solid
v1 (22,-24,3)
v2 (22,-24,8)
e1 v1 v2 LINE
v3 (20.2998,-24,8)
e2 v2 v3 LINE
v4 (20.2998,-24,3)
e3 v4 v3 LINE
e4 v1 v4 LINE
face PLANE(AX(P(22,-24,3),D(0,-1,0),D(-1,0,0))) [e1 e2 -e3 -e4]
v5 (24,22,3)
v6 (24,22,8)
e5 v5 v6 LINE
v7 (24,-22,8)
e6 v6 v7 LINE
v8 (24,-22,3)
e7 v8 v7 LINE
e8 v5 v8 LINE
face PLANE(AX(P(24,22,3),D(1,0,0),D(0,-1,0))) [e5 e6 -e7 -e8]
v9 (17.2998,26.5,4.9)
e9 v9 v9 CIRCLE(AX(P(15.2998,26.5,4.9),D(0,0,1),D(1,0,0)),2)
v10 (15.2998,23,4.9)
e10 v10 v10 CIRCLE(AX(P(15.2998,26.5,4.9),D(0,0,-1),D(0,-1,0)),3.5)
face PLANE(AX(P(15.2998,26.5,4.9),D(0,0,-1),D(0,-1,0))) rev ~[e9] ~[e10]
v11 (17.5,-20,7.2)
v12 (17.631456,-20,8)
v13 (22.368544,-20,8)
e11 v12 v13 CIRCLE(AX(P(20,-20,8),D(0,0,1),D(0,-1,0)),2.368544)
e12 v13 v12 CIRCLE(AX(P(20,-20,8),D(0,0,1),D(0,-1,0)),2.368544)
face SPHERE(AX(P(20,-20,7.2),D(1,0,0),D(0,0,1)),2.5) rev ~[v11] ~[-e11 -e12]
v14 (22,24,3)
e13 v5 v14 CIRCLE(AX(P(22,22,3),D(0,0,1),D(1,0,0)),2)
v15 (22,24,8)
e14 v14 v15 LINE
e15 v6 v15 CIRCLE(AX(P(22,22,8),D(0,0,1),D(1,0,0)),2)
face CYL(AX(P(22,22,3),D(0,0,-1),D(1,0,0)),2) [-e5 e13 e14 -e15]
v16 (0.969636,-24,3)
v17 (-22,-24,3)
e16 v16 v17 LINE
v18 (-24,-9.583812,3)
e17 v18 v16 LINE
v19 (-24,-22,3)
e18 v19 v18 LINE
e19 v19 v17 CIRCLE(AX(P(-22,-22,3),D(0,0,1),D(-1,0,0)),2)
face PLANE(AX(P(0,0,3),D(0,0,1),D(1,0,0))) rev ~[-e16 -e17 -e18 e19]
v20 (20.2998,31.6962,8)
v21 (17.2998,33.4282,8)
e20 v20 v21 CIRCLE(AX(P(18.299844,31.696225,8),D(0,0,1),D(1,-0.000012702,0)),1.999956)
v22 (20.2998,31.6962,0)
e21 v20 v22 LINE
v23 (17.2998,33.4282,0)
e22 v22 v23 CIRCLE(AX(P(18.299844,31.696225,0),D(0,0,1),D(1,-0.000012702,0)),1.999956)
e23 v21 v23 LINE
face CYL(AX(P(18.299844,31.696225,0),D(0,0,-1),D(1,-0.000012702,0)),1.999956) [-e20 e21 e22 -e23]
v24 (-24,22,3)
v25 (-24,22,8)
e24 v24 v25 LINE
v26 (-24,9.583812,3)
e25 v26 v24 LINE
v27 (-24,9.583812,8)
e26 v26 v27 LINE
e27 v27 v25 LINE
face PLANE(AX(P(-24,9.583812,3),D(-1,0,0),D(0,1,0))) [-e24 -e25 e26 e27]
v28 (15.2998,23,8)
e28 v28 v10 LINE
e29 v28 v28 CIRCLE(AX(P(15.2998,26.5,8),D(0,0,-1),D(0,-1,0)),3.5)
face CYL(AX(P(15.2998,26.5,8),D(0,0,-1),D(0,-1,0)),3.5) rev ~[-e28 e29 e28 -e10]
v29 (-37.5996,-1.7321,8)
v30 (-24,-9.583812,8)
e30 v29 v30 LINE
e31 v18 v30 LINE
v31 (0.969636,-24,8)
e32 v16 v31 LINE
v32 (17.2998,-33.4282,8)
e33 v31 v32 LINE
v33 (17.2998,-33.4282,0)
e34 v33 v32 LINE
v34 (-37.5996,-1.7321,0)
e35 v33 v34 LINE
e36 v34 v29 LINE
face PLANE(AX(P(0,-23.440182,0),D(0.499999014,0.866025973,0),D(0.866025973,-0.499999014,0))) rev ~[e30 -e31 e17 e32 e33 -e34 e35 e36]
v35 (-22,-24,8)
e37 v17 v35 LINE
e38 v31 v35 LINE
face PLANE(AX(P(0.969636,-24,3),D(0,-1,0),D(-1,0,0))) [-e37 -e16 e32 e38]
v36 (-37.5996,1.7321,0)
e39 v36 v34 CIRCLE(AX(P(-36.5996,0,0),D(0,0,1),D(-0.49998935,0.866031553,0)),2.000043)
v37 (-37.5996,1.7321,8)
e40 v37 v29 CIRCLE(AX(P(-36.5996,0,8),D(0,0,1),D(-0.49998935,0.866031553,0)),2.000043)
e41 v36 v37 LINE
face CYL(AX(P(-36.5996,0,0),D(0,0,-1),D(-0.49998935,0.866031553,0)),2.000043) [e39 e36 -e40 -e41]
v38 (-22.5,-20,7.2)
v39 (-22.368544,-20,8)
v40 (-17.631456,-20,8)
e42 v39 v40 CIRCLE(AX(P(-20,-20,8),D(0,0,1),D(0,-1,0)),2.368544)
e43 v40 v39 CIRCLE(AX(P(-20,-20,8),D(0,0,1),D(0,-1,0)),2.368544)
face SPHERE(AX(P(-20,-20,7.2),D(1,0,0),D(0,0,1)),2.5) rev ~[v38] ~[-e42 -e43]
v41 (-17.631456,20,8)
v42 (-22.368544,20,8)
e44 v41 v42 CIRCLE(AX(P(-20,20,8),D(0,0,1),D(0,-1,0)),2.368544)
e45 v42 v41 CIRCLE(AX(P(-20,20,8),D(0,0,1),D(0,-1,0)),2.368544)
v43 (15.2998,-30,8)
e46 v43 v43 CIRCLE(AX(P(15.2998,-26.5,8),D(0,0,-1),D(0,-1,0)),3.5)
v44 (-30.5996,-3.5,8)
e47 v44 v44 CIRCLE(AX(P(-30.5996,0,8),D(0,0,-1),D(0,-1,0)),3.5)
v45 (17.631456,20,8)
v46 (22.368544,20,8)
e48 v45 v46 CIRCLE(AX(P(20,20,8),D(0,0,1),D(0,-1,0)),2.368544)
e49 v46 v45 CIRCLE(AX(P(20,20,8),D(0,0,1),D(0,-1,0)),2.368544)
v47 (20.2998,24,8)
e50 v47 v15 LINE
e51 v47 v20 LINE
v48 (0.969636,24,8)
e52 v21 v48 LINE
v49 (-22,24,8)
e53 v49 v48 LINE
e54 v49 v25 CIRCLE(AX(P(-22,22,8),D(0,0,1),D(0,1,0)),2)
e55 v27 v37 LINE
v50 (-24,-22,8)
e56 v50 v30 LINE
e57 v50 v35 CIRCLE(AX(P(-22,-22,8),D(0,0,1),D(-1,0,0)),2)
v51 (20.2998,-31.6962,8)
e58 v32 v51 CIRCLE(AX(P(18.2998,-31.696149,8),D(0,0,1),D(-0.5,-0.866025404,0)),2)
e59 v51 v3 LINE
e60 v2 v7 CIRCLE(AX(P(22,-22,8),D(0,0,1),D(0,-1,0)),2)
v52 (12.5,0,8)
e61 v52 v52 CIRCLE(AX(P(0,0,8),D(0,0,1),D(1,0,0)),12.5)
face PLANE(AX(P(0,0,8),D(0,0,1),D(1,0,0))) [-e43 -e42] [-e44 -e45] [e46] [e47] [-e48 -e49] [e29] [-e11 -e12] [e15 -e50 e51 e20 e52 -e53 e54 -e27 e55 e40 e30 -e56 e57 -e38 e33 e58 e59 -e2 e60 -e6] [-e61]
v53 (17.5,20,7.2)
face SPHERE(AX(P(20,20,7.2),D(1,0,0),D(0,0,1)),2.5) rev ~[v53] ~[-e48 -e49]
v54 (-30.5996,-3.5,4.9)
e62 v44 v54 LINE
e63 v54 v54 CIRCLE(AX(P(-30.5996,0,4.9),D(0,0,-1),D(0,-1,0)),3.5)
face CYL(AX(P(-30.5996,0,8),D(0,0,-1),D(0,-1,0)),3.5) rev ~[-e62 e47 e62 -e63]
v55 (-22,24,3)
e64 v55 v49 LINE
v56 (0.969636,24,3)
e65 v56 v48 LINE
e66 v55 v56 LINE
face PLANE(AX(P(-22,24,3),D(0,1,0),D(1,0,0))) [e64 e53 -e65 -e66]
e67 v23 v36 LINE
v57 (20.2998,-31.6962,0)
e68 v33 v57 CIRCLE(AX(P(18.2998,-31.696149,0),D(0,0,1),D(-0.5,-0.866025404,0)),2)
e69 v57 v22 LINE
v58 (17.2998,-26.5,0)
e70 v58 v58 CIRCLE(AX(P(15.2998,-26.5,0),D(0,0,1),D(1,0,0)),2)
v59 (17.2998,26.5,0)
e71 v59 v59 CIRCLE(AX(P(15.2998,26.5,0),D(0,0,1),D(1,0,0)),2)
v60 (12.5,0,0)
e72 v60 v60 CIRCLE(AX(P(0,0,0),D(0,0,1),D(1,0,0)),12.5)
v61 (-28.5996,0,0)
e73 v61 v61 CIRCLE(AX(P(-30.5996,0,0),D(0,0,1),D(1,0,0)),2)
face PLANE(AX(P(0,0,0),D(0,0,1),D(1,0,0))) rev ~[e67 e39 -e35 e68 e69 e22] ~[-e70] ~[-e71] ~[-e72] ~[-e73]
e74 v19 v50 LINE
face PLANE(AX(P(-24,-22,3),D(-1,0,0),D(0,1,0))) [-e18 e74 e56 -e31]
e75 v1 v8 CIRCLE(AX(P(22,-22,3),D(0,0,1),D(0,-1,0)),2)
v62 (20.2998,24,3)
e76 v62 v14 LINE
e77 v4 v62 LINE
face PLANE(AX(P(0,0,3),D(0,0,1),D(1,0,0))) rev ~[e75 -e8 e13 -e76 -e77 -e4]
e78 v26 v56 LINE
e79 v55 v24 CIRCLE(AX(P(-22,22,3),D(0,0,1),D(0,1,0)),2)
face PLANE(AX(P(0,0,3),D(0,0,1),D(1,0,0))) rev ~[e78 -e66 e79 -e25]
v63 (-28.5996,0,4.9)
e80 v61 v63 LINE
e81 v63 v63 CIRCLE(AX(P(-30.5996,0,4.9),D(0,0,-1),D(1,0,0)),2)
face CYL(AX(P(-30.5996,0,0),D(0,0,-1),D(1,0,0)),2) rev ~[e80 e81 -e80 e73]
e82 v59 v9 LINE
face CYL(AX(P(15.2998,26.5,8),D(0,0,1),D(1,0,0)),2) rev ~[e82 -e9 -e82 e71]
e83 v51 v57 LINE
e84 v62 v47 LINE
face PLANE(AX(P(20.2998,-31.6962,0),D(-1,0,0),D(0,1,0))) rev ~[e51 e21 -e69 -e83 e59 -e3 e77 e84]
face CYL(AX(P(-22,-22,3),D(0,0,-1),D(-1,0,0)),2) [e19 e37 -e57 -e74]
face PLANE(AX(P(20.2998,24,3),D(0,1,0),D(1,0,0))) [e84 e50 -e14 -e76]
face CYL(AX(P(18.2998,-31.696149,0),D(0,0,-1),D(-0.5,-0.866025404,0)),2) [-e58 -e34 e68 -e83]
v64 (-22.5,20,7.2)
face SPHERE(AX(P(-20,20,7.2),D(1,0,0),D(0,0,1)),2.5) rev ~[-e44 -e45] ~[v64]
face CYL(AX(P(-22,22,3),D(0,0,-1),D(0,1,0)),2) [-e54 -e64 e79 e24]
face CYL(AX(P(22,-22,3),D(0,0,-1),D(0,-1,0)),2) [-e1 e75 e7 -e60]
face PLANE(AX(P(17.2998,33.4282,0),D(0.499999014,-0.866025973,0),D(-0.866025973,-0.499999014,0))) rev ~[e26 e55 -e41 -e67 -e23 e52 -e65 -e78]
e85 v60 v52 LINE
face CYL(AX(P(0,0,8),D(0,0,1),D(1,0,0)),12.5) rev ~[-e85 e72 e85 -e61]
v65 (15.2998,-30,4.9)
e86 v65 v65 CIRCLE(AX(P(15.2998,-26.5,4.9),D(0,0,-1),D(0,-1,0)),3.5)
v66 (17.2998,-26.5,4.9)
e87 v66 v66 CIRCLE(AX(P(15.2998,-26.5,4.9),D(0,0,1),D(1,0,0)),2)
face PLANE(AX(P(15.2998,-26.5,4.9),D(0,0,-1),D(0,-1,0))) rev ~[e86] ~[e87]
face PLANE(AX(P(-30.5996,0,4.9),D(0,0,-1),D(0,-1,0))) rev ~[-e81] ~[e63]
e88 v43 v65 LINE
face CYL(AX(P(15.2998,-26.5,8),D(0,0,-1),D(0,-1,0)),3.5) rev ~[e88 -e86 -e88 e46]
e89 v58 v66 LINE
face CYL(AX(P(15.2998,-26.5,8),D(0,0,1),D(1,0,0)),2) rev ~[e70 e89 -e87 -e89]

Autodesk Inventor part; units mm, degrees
ref_plane "YZ Plane" through (0, 0, 0) normal (1, 0, 0) x (0, 1, 0)
ref_plane "XZ Plane" through (0, 0, 0) normal (0, 1, 0) x (-1, 0, 0)
ref_plane "XY Plane" through (0, 0, 0) normal (0, 0, 1) x (1, 0, 0)
sketch "Sketch1" plane through (0, 0, 0) normal (0, 0, 1) x (1, 0, 0)
  line L0 (15.2998, 26.5) -> (15.2998, -26.5) construction
  line L1 (15.2998, -26.5) -> (-30.5996, 0) construction
  line L2 (-30.5996, 0) -> (15.2998, 26.5) construction
  line L3 (0, 48.0119) -> (0, -48.0119) projected
  circle A0 centre (0, 0) radius 12.5
  line L4 (24.9, -24.45) -> (-24.9, -24.45) construction
  line L5 (-24.9, -24.45) -> (-24.9, 24.45) construction
  line L6 (-24.9, 24.45) -> (24.9, 24.45) construction
  line L7 (24.9, 24.45) -> (24.9, -24.45) construction
  line L8 (24.9, -24.45) -> (-24.9, 24.45) construction
  line L9 (-24.9, -24.45) -> (24.9, 24.45) construction
  line L10 (20, -20) -> (-20, -20) construction
  line L11 (-20, -20) -> (-20, 20) construction
  line L12 (-20, 20) -> (20, 20) construction
  line L13 (20, 20) -> (20, -20) construction
  line L14 (20, -20) -> (-20, 20) construction
  line L15 (-20, -20) -> (20, 20) construction
  line L16 (-37.5996, -1.7321) -> (17.2998, -33.4282)
  line L17 (20.2998, -31.6962) -> (20.2998, 31.6962)
  line L18 (17.2998, 33.4282) -> (-37.5996, 1.7321)
  arc A1 (-37.5996, 1.7321) -> (-37.5996, -1.7321) centre (-36.5996, 0) ccw
  arc A2 (20.2998, 31.6962) -> (17.2998, 33.4282) centre (18.2998, 31.6962) ccw
  arc A3 (17.2998, -33.4282) -> (20.2998, -31.6962) centre (18.2998, -31.6962) ccw
  circle A4 centre (15.2998, 26.5) radius 2
  circle A5 centre (-30.5996, 0) radius 2
  circle A6 centre (15.2998, -26.5) radius 2
  dimension "d1" = 53
  dimension "d2" = 25
  dimension "d3" = 49.8
  dimension "d4" = 48.9
  dimension "d5" = 40
  dimension "d6" = 40
  dimension "d7" = 5
  dimension "d8" = 2
  dimension "d9" = 4
  dimension "d10" = 4
  dimension "d11" = 4
extrude "Extrusion1" add sketch "Sketch1" along normal blind 3 contours L18 A2 L17 A3 L16 L3 A0 | L3 A0 L16 A1 L18
sketch "Sketch3" plane through (0, 0, 3) normal (0, 0, 1) x (1, 0, 0)
  circle A0 centre (0, 0) radius 12.5 projected
  circle A1 centre (15.2998, -26.5) radius 2 projected
  circle A2 centre (-30.5996, 0) radius 2 projected
  circle A3 centre (15.2998, 26.5) radius 2 projected
  line L0 (-37.5996, -1.7321) -> (17.2998, -33.4282) projected
  arc A4 (17.2998, -33.4282) -> (20.2998, -31.6962) centre (18.2998, -31.6962) ccw projected
  line L1 (20.2998, -31.6962) -> (20.2998, 31.6962) projected
  arc A5 (20.2998, 31.6962) -> (17.2998, 33.4282) centre (18.2998, 31.6962) ccw projected
  line L2 (17.2998, 33.4282) -> (-37.5996, 1.7321) projected
  arc A6 (-37.5996, 1.7321) -> (-37.5996, -1.7321) centre (-36.5996, 0) ccw projected
  line L3 (22, -24) -> (-22, -24)
  line L4 (-24, -22) -> (-24, 22)
  line L5 (-22, 24) -> (22, 24)
  line L6 (24, 22) -> (24, -22)
  line L7 (24, -24) -> (-24, 24) construction
  line L8 (-24, -24) -> (24, 24) construction
  arc A7 (-22, 24) -> (-24, 22) centre (-22, 22) ccw
  arc A8 (-24, -22) -> (-22, -24) centre (-22, -22) ccw
  arc A9 (22, -24) -> (24, -22) centre (22, -22) ccw
  arc A10 (24, 22) -> (22, 24) centre (22, 22) ccw
  line L9 (17.2998, 33.4282) -> (-37.5996, 1.7321) projected
  line L10 (-37.5996, -1.7321) -> (17.2998, -33.4282) projected
  line L11 (20.2998, -31.6962) -> (20.2998, 31.6962) projected
  point P0 (20.2998, 24)
  point P1 (-24, 9.5838)
  point P2 (-24, -9.5838)
  point P3 (0.9697, -24)
  point P4 (20.2998, -24)
  dimension "d14" = 48
  dimension "d15" = 48
  dimension "d16" = 2
extrude "Extrusion2" add sketch "Sketch3" along normal blind 5 contours A0 | A1 | A3 | A6 L2 L4 L0 | L4 L2 L5 L1 L3 L0 | L0 L3 A8 L4 | L3 L1 A4 L0 | L4 A7 L5 L2 | L1 L5 A10 L6 A9 L3 | L2 A5 L1 L5
sketch "Sketch4" plane through (0, 0, 8) normal (0, 0, 1) x (1, 0, 0)
  circle A0 centre (0, 0) radius 12.5 projected
  line L0 (20, -20) -> (-20, -20) construction
  line L1 (-20, -20) -> (-20, 20) construction
  line L2 (-20, 20) -> (20, 20) construction
  line L3 (20, 20) -> (20, -20) construction
  line L4 (20, -20) -> (-20, 20) construction
  line L5 (-20, -20) -> (20, 20) construction
  circle A1 centre (15.2998, 26.5) radius 2 projected
  circle A2 centre (15.2998, -26.5) radius 2 projected
  dimension "d19" = 40
  dimension "d20" = 40
extrude "Extrusion3" cut sketch "Sketch4" against normal through all
ref_plane "Work Plane1" through (-22, 0, 3) normal (0, 1, 0) x (1, 0, 0)
ref_plane "Work Plane2" through (0, -22, 3) normal (-1, 0, 0) x (0, 0, 1)
ref_plane "Work Plane3" through (-22, -20, 3) normal (0, 1, 0) x (1, 0, 0)
sketch "Sketch5" plane through (-22, -20, 3) normal (0, 1, 0) x (1, 0, 0)
  line L0 (22.9697, 0) -> (22.9697, -5) projected
  line L1 (22.9697, 0) -> (0, 0) projected
  line L2 (0, 0) -> (0, -5) projected
  line L3 (22.9697, -5) -> (0, -5) projected
  circle A0 centre (2, -4.2) radius 2.5
  line L4 (22, -11.7547) -> (22, 5.4591) projected
  line L5 (-0.5, -4.2) -> (4.5, -4.2)
  line L6 (0, 0) -> (0, -5) projected
  point P0 (22, 3)
  dimension "d24" = 5
  dimension "d25" = 20
  dimension "d26" = 0.8
revolve "Revolution1" cut sketch "Sketch5" angle 360 about axis through (-22.5, -20, 7.2) along (1, 0, 0) contours A0 L5 L2 L3 | L3 L2 L5 A0
pattern_linear "Rectangular Pattern1" count 2 spacing 40 along (1, 0, 0) count 2 spacing 40 along (0, 1, 0) of "Revolution1"
sketch "Sketch6" plane through (0, 0, 8) normal (0, 0, 1) x (1, 0, 0)
  circle A0 centre (20, 20) radius 2.3685 projected
  circle A1 centre (-20, 20) radius 2.3685 projected
  circle A2 centre (20, -20) radius 2.3685 projected
  circle A3 centre (-20, -20) radius 2.3685 projected
  circle A4 centre (15.2998, -26.5) radius 2 projected
  circle A5 centre (15.2998, 26.5) radius 2 projected
  circle A6 centre (0, 0) radius 12.5 projected
  circle A7 centre (-30.5996, 0) radius 2 projected
  line L0 (0.9697, 24) -> (-22, 24) projected
  arc A8 (-22, 24) -> (-24, 22) centre (-22, 22) ccw projected
  line L1 (-24, 22) -> (-24, 9.5838) projected
  line L2 (-24, 9.5838) -> (-37.5996, 1.7321) projected
  arc A9 (-37.5996, 1.7321) -> (-37.5996, -1.7321) centre (-36.5996, 0) ccw projected
  line L3 (-37.5996, -1.7321) -> (-24, -9.5838) projected
  line L4 (-24, -9.5838) -> (-24, -22) projected
  arc A10 (-24, -22) -> (-22, -24) centre (-22, -22) ccw projected
  line L5 (-22, -24) -> (0.9697, -24) projected
  line L6 (0.9697, -24) -> (17.2998, -33.4282) projected
  arc A11 (17.2998, -33.4282) -> (20.2998, -31.6962) centre (18.2998, -31.6962) ccw projected
  line L7 (20.2998, -31.6962) -> (20.2998, -24) projected
  line L8 (20.2998, -24) -> (22, -24) projected
  arc A12 (22, -24) -> (24, -22) centre (22, -22) ccw projected
  line L9 (24, -22) -> (24, 22) projected
  arc A13 (24, 22) -> (22, 24) centre (22, 22) ccw projected
  line L10 (22, 24) -> (20.2998, 24) projected
  line L11 (20.2998, 24) -> (20.2998, 31.6962) projected
  arc A14 (20.2998, 31.6962) -> (17.2998, 33.4282) centre (18.2998, 31.6962) ccw projected
  line L12 (17.2998, 33.4282) -> (0.9697, 24) projected
hole "Hole1" at (15.2998, 26.5, 8) at (15.2998, -26.5, 8) at (-30.5996, 0, 8) direction (0, 0, -1) diameter 2.8 depth 30 tip angle 118 counterbore diameter 7 counterbore depth 3.1
properties part number "20_Cube_Insert_Openflexure_Deltastage_Adapter"
